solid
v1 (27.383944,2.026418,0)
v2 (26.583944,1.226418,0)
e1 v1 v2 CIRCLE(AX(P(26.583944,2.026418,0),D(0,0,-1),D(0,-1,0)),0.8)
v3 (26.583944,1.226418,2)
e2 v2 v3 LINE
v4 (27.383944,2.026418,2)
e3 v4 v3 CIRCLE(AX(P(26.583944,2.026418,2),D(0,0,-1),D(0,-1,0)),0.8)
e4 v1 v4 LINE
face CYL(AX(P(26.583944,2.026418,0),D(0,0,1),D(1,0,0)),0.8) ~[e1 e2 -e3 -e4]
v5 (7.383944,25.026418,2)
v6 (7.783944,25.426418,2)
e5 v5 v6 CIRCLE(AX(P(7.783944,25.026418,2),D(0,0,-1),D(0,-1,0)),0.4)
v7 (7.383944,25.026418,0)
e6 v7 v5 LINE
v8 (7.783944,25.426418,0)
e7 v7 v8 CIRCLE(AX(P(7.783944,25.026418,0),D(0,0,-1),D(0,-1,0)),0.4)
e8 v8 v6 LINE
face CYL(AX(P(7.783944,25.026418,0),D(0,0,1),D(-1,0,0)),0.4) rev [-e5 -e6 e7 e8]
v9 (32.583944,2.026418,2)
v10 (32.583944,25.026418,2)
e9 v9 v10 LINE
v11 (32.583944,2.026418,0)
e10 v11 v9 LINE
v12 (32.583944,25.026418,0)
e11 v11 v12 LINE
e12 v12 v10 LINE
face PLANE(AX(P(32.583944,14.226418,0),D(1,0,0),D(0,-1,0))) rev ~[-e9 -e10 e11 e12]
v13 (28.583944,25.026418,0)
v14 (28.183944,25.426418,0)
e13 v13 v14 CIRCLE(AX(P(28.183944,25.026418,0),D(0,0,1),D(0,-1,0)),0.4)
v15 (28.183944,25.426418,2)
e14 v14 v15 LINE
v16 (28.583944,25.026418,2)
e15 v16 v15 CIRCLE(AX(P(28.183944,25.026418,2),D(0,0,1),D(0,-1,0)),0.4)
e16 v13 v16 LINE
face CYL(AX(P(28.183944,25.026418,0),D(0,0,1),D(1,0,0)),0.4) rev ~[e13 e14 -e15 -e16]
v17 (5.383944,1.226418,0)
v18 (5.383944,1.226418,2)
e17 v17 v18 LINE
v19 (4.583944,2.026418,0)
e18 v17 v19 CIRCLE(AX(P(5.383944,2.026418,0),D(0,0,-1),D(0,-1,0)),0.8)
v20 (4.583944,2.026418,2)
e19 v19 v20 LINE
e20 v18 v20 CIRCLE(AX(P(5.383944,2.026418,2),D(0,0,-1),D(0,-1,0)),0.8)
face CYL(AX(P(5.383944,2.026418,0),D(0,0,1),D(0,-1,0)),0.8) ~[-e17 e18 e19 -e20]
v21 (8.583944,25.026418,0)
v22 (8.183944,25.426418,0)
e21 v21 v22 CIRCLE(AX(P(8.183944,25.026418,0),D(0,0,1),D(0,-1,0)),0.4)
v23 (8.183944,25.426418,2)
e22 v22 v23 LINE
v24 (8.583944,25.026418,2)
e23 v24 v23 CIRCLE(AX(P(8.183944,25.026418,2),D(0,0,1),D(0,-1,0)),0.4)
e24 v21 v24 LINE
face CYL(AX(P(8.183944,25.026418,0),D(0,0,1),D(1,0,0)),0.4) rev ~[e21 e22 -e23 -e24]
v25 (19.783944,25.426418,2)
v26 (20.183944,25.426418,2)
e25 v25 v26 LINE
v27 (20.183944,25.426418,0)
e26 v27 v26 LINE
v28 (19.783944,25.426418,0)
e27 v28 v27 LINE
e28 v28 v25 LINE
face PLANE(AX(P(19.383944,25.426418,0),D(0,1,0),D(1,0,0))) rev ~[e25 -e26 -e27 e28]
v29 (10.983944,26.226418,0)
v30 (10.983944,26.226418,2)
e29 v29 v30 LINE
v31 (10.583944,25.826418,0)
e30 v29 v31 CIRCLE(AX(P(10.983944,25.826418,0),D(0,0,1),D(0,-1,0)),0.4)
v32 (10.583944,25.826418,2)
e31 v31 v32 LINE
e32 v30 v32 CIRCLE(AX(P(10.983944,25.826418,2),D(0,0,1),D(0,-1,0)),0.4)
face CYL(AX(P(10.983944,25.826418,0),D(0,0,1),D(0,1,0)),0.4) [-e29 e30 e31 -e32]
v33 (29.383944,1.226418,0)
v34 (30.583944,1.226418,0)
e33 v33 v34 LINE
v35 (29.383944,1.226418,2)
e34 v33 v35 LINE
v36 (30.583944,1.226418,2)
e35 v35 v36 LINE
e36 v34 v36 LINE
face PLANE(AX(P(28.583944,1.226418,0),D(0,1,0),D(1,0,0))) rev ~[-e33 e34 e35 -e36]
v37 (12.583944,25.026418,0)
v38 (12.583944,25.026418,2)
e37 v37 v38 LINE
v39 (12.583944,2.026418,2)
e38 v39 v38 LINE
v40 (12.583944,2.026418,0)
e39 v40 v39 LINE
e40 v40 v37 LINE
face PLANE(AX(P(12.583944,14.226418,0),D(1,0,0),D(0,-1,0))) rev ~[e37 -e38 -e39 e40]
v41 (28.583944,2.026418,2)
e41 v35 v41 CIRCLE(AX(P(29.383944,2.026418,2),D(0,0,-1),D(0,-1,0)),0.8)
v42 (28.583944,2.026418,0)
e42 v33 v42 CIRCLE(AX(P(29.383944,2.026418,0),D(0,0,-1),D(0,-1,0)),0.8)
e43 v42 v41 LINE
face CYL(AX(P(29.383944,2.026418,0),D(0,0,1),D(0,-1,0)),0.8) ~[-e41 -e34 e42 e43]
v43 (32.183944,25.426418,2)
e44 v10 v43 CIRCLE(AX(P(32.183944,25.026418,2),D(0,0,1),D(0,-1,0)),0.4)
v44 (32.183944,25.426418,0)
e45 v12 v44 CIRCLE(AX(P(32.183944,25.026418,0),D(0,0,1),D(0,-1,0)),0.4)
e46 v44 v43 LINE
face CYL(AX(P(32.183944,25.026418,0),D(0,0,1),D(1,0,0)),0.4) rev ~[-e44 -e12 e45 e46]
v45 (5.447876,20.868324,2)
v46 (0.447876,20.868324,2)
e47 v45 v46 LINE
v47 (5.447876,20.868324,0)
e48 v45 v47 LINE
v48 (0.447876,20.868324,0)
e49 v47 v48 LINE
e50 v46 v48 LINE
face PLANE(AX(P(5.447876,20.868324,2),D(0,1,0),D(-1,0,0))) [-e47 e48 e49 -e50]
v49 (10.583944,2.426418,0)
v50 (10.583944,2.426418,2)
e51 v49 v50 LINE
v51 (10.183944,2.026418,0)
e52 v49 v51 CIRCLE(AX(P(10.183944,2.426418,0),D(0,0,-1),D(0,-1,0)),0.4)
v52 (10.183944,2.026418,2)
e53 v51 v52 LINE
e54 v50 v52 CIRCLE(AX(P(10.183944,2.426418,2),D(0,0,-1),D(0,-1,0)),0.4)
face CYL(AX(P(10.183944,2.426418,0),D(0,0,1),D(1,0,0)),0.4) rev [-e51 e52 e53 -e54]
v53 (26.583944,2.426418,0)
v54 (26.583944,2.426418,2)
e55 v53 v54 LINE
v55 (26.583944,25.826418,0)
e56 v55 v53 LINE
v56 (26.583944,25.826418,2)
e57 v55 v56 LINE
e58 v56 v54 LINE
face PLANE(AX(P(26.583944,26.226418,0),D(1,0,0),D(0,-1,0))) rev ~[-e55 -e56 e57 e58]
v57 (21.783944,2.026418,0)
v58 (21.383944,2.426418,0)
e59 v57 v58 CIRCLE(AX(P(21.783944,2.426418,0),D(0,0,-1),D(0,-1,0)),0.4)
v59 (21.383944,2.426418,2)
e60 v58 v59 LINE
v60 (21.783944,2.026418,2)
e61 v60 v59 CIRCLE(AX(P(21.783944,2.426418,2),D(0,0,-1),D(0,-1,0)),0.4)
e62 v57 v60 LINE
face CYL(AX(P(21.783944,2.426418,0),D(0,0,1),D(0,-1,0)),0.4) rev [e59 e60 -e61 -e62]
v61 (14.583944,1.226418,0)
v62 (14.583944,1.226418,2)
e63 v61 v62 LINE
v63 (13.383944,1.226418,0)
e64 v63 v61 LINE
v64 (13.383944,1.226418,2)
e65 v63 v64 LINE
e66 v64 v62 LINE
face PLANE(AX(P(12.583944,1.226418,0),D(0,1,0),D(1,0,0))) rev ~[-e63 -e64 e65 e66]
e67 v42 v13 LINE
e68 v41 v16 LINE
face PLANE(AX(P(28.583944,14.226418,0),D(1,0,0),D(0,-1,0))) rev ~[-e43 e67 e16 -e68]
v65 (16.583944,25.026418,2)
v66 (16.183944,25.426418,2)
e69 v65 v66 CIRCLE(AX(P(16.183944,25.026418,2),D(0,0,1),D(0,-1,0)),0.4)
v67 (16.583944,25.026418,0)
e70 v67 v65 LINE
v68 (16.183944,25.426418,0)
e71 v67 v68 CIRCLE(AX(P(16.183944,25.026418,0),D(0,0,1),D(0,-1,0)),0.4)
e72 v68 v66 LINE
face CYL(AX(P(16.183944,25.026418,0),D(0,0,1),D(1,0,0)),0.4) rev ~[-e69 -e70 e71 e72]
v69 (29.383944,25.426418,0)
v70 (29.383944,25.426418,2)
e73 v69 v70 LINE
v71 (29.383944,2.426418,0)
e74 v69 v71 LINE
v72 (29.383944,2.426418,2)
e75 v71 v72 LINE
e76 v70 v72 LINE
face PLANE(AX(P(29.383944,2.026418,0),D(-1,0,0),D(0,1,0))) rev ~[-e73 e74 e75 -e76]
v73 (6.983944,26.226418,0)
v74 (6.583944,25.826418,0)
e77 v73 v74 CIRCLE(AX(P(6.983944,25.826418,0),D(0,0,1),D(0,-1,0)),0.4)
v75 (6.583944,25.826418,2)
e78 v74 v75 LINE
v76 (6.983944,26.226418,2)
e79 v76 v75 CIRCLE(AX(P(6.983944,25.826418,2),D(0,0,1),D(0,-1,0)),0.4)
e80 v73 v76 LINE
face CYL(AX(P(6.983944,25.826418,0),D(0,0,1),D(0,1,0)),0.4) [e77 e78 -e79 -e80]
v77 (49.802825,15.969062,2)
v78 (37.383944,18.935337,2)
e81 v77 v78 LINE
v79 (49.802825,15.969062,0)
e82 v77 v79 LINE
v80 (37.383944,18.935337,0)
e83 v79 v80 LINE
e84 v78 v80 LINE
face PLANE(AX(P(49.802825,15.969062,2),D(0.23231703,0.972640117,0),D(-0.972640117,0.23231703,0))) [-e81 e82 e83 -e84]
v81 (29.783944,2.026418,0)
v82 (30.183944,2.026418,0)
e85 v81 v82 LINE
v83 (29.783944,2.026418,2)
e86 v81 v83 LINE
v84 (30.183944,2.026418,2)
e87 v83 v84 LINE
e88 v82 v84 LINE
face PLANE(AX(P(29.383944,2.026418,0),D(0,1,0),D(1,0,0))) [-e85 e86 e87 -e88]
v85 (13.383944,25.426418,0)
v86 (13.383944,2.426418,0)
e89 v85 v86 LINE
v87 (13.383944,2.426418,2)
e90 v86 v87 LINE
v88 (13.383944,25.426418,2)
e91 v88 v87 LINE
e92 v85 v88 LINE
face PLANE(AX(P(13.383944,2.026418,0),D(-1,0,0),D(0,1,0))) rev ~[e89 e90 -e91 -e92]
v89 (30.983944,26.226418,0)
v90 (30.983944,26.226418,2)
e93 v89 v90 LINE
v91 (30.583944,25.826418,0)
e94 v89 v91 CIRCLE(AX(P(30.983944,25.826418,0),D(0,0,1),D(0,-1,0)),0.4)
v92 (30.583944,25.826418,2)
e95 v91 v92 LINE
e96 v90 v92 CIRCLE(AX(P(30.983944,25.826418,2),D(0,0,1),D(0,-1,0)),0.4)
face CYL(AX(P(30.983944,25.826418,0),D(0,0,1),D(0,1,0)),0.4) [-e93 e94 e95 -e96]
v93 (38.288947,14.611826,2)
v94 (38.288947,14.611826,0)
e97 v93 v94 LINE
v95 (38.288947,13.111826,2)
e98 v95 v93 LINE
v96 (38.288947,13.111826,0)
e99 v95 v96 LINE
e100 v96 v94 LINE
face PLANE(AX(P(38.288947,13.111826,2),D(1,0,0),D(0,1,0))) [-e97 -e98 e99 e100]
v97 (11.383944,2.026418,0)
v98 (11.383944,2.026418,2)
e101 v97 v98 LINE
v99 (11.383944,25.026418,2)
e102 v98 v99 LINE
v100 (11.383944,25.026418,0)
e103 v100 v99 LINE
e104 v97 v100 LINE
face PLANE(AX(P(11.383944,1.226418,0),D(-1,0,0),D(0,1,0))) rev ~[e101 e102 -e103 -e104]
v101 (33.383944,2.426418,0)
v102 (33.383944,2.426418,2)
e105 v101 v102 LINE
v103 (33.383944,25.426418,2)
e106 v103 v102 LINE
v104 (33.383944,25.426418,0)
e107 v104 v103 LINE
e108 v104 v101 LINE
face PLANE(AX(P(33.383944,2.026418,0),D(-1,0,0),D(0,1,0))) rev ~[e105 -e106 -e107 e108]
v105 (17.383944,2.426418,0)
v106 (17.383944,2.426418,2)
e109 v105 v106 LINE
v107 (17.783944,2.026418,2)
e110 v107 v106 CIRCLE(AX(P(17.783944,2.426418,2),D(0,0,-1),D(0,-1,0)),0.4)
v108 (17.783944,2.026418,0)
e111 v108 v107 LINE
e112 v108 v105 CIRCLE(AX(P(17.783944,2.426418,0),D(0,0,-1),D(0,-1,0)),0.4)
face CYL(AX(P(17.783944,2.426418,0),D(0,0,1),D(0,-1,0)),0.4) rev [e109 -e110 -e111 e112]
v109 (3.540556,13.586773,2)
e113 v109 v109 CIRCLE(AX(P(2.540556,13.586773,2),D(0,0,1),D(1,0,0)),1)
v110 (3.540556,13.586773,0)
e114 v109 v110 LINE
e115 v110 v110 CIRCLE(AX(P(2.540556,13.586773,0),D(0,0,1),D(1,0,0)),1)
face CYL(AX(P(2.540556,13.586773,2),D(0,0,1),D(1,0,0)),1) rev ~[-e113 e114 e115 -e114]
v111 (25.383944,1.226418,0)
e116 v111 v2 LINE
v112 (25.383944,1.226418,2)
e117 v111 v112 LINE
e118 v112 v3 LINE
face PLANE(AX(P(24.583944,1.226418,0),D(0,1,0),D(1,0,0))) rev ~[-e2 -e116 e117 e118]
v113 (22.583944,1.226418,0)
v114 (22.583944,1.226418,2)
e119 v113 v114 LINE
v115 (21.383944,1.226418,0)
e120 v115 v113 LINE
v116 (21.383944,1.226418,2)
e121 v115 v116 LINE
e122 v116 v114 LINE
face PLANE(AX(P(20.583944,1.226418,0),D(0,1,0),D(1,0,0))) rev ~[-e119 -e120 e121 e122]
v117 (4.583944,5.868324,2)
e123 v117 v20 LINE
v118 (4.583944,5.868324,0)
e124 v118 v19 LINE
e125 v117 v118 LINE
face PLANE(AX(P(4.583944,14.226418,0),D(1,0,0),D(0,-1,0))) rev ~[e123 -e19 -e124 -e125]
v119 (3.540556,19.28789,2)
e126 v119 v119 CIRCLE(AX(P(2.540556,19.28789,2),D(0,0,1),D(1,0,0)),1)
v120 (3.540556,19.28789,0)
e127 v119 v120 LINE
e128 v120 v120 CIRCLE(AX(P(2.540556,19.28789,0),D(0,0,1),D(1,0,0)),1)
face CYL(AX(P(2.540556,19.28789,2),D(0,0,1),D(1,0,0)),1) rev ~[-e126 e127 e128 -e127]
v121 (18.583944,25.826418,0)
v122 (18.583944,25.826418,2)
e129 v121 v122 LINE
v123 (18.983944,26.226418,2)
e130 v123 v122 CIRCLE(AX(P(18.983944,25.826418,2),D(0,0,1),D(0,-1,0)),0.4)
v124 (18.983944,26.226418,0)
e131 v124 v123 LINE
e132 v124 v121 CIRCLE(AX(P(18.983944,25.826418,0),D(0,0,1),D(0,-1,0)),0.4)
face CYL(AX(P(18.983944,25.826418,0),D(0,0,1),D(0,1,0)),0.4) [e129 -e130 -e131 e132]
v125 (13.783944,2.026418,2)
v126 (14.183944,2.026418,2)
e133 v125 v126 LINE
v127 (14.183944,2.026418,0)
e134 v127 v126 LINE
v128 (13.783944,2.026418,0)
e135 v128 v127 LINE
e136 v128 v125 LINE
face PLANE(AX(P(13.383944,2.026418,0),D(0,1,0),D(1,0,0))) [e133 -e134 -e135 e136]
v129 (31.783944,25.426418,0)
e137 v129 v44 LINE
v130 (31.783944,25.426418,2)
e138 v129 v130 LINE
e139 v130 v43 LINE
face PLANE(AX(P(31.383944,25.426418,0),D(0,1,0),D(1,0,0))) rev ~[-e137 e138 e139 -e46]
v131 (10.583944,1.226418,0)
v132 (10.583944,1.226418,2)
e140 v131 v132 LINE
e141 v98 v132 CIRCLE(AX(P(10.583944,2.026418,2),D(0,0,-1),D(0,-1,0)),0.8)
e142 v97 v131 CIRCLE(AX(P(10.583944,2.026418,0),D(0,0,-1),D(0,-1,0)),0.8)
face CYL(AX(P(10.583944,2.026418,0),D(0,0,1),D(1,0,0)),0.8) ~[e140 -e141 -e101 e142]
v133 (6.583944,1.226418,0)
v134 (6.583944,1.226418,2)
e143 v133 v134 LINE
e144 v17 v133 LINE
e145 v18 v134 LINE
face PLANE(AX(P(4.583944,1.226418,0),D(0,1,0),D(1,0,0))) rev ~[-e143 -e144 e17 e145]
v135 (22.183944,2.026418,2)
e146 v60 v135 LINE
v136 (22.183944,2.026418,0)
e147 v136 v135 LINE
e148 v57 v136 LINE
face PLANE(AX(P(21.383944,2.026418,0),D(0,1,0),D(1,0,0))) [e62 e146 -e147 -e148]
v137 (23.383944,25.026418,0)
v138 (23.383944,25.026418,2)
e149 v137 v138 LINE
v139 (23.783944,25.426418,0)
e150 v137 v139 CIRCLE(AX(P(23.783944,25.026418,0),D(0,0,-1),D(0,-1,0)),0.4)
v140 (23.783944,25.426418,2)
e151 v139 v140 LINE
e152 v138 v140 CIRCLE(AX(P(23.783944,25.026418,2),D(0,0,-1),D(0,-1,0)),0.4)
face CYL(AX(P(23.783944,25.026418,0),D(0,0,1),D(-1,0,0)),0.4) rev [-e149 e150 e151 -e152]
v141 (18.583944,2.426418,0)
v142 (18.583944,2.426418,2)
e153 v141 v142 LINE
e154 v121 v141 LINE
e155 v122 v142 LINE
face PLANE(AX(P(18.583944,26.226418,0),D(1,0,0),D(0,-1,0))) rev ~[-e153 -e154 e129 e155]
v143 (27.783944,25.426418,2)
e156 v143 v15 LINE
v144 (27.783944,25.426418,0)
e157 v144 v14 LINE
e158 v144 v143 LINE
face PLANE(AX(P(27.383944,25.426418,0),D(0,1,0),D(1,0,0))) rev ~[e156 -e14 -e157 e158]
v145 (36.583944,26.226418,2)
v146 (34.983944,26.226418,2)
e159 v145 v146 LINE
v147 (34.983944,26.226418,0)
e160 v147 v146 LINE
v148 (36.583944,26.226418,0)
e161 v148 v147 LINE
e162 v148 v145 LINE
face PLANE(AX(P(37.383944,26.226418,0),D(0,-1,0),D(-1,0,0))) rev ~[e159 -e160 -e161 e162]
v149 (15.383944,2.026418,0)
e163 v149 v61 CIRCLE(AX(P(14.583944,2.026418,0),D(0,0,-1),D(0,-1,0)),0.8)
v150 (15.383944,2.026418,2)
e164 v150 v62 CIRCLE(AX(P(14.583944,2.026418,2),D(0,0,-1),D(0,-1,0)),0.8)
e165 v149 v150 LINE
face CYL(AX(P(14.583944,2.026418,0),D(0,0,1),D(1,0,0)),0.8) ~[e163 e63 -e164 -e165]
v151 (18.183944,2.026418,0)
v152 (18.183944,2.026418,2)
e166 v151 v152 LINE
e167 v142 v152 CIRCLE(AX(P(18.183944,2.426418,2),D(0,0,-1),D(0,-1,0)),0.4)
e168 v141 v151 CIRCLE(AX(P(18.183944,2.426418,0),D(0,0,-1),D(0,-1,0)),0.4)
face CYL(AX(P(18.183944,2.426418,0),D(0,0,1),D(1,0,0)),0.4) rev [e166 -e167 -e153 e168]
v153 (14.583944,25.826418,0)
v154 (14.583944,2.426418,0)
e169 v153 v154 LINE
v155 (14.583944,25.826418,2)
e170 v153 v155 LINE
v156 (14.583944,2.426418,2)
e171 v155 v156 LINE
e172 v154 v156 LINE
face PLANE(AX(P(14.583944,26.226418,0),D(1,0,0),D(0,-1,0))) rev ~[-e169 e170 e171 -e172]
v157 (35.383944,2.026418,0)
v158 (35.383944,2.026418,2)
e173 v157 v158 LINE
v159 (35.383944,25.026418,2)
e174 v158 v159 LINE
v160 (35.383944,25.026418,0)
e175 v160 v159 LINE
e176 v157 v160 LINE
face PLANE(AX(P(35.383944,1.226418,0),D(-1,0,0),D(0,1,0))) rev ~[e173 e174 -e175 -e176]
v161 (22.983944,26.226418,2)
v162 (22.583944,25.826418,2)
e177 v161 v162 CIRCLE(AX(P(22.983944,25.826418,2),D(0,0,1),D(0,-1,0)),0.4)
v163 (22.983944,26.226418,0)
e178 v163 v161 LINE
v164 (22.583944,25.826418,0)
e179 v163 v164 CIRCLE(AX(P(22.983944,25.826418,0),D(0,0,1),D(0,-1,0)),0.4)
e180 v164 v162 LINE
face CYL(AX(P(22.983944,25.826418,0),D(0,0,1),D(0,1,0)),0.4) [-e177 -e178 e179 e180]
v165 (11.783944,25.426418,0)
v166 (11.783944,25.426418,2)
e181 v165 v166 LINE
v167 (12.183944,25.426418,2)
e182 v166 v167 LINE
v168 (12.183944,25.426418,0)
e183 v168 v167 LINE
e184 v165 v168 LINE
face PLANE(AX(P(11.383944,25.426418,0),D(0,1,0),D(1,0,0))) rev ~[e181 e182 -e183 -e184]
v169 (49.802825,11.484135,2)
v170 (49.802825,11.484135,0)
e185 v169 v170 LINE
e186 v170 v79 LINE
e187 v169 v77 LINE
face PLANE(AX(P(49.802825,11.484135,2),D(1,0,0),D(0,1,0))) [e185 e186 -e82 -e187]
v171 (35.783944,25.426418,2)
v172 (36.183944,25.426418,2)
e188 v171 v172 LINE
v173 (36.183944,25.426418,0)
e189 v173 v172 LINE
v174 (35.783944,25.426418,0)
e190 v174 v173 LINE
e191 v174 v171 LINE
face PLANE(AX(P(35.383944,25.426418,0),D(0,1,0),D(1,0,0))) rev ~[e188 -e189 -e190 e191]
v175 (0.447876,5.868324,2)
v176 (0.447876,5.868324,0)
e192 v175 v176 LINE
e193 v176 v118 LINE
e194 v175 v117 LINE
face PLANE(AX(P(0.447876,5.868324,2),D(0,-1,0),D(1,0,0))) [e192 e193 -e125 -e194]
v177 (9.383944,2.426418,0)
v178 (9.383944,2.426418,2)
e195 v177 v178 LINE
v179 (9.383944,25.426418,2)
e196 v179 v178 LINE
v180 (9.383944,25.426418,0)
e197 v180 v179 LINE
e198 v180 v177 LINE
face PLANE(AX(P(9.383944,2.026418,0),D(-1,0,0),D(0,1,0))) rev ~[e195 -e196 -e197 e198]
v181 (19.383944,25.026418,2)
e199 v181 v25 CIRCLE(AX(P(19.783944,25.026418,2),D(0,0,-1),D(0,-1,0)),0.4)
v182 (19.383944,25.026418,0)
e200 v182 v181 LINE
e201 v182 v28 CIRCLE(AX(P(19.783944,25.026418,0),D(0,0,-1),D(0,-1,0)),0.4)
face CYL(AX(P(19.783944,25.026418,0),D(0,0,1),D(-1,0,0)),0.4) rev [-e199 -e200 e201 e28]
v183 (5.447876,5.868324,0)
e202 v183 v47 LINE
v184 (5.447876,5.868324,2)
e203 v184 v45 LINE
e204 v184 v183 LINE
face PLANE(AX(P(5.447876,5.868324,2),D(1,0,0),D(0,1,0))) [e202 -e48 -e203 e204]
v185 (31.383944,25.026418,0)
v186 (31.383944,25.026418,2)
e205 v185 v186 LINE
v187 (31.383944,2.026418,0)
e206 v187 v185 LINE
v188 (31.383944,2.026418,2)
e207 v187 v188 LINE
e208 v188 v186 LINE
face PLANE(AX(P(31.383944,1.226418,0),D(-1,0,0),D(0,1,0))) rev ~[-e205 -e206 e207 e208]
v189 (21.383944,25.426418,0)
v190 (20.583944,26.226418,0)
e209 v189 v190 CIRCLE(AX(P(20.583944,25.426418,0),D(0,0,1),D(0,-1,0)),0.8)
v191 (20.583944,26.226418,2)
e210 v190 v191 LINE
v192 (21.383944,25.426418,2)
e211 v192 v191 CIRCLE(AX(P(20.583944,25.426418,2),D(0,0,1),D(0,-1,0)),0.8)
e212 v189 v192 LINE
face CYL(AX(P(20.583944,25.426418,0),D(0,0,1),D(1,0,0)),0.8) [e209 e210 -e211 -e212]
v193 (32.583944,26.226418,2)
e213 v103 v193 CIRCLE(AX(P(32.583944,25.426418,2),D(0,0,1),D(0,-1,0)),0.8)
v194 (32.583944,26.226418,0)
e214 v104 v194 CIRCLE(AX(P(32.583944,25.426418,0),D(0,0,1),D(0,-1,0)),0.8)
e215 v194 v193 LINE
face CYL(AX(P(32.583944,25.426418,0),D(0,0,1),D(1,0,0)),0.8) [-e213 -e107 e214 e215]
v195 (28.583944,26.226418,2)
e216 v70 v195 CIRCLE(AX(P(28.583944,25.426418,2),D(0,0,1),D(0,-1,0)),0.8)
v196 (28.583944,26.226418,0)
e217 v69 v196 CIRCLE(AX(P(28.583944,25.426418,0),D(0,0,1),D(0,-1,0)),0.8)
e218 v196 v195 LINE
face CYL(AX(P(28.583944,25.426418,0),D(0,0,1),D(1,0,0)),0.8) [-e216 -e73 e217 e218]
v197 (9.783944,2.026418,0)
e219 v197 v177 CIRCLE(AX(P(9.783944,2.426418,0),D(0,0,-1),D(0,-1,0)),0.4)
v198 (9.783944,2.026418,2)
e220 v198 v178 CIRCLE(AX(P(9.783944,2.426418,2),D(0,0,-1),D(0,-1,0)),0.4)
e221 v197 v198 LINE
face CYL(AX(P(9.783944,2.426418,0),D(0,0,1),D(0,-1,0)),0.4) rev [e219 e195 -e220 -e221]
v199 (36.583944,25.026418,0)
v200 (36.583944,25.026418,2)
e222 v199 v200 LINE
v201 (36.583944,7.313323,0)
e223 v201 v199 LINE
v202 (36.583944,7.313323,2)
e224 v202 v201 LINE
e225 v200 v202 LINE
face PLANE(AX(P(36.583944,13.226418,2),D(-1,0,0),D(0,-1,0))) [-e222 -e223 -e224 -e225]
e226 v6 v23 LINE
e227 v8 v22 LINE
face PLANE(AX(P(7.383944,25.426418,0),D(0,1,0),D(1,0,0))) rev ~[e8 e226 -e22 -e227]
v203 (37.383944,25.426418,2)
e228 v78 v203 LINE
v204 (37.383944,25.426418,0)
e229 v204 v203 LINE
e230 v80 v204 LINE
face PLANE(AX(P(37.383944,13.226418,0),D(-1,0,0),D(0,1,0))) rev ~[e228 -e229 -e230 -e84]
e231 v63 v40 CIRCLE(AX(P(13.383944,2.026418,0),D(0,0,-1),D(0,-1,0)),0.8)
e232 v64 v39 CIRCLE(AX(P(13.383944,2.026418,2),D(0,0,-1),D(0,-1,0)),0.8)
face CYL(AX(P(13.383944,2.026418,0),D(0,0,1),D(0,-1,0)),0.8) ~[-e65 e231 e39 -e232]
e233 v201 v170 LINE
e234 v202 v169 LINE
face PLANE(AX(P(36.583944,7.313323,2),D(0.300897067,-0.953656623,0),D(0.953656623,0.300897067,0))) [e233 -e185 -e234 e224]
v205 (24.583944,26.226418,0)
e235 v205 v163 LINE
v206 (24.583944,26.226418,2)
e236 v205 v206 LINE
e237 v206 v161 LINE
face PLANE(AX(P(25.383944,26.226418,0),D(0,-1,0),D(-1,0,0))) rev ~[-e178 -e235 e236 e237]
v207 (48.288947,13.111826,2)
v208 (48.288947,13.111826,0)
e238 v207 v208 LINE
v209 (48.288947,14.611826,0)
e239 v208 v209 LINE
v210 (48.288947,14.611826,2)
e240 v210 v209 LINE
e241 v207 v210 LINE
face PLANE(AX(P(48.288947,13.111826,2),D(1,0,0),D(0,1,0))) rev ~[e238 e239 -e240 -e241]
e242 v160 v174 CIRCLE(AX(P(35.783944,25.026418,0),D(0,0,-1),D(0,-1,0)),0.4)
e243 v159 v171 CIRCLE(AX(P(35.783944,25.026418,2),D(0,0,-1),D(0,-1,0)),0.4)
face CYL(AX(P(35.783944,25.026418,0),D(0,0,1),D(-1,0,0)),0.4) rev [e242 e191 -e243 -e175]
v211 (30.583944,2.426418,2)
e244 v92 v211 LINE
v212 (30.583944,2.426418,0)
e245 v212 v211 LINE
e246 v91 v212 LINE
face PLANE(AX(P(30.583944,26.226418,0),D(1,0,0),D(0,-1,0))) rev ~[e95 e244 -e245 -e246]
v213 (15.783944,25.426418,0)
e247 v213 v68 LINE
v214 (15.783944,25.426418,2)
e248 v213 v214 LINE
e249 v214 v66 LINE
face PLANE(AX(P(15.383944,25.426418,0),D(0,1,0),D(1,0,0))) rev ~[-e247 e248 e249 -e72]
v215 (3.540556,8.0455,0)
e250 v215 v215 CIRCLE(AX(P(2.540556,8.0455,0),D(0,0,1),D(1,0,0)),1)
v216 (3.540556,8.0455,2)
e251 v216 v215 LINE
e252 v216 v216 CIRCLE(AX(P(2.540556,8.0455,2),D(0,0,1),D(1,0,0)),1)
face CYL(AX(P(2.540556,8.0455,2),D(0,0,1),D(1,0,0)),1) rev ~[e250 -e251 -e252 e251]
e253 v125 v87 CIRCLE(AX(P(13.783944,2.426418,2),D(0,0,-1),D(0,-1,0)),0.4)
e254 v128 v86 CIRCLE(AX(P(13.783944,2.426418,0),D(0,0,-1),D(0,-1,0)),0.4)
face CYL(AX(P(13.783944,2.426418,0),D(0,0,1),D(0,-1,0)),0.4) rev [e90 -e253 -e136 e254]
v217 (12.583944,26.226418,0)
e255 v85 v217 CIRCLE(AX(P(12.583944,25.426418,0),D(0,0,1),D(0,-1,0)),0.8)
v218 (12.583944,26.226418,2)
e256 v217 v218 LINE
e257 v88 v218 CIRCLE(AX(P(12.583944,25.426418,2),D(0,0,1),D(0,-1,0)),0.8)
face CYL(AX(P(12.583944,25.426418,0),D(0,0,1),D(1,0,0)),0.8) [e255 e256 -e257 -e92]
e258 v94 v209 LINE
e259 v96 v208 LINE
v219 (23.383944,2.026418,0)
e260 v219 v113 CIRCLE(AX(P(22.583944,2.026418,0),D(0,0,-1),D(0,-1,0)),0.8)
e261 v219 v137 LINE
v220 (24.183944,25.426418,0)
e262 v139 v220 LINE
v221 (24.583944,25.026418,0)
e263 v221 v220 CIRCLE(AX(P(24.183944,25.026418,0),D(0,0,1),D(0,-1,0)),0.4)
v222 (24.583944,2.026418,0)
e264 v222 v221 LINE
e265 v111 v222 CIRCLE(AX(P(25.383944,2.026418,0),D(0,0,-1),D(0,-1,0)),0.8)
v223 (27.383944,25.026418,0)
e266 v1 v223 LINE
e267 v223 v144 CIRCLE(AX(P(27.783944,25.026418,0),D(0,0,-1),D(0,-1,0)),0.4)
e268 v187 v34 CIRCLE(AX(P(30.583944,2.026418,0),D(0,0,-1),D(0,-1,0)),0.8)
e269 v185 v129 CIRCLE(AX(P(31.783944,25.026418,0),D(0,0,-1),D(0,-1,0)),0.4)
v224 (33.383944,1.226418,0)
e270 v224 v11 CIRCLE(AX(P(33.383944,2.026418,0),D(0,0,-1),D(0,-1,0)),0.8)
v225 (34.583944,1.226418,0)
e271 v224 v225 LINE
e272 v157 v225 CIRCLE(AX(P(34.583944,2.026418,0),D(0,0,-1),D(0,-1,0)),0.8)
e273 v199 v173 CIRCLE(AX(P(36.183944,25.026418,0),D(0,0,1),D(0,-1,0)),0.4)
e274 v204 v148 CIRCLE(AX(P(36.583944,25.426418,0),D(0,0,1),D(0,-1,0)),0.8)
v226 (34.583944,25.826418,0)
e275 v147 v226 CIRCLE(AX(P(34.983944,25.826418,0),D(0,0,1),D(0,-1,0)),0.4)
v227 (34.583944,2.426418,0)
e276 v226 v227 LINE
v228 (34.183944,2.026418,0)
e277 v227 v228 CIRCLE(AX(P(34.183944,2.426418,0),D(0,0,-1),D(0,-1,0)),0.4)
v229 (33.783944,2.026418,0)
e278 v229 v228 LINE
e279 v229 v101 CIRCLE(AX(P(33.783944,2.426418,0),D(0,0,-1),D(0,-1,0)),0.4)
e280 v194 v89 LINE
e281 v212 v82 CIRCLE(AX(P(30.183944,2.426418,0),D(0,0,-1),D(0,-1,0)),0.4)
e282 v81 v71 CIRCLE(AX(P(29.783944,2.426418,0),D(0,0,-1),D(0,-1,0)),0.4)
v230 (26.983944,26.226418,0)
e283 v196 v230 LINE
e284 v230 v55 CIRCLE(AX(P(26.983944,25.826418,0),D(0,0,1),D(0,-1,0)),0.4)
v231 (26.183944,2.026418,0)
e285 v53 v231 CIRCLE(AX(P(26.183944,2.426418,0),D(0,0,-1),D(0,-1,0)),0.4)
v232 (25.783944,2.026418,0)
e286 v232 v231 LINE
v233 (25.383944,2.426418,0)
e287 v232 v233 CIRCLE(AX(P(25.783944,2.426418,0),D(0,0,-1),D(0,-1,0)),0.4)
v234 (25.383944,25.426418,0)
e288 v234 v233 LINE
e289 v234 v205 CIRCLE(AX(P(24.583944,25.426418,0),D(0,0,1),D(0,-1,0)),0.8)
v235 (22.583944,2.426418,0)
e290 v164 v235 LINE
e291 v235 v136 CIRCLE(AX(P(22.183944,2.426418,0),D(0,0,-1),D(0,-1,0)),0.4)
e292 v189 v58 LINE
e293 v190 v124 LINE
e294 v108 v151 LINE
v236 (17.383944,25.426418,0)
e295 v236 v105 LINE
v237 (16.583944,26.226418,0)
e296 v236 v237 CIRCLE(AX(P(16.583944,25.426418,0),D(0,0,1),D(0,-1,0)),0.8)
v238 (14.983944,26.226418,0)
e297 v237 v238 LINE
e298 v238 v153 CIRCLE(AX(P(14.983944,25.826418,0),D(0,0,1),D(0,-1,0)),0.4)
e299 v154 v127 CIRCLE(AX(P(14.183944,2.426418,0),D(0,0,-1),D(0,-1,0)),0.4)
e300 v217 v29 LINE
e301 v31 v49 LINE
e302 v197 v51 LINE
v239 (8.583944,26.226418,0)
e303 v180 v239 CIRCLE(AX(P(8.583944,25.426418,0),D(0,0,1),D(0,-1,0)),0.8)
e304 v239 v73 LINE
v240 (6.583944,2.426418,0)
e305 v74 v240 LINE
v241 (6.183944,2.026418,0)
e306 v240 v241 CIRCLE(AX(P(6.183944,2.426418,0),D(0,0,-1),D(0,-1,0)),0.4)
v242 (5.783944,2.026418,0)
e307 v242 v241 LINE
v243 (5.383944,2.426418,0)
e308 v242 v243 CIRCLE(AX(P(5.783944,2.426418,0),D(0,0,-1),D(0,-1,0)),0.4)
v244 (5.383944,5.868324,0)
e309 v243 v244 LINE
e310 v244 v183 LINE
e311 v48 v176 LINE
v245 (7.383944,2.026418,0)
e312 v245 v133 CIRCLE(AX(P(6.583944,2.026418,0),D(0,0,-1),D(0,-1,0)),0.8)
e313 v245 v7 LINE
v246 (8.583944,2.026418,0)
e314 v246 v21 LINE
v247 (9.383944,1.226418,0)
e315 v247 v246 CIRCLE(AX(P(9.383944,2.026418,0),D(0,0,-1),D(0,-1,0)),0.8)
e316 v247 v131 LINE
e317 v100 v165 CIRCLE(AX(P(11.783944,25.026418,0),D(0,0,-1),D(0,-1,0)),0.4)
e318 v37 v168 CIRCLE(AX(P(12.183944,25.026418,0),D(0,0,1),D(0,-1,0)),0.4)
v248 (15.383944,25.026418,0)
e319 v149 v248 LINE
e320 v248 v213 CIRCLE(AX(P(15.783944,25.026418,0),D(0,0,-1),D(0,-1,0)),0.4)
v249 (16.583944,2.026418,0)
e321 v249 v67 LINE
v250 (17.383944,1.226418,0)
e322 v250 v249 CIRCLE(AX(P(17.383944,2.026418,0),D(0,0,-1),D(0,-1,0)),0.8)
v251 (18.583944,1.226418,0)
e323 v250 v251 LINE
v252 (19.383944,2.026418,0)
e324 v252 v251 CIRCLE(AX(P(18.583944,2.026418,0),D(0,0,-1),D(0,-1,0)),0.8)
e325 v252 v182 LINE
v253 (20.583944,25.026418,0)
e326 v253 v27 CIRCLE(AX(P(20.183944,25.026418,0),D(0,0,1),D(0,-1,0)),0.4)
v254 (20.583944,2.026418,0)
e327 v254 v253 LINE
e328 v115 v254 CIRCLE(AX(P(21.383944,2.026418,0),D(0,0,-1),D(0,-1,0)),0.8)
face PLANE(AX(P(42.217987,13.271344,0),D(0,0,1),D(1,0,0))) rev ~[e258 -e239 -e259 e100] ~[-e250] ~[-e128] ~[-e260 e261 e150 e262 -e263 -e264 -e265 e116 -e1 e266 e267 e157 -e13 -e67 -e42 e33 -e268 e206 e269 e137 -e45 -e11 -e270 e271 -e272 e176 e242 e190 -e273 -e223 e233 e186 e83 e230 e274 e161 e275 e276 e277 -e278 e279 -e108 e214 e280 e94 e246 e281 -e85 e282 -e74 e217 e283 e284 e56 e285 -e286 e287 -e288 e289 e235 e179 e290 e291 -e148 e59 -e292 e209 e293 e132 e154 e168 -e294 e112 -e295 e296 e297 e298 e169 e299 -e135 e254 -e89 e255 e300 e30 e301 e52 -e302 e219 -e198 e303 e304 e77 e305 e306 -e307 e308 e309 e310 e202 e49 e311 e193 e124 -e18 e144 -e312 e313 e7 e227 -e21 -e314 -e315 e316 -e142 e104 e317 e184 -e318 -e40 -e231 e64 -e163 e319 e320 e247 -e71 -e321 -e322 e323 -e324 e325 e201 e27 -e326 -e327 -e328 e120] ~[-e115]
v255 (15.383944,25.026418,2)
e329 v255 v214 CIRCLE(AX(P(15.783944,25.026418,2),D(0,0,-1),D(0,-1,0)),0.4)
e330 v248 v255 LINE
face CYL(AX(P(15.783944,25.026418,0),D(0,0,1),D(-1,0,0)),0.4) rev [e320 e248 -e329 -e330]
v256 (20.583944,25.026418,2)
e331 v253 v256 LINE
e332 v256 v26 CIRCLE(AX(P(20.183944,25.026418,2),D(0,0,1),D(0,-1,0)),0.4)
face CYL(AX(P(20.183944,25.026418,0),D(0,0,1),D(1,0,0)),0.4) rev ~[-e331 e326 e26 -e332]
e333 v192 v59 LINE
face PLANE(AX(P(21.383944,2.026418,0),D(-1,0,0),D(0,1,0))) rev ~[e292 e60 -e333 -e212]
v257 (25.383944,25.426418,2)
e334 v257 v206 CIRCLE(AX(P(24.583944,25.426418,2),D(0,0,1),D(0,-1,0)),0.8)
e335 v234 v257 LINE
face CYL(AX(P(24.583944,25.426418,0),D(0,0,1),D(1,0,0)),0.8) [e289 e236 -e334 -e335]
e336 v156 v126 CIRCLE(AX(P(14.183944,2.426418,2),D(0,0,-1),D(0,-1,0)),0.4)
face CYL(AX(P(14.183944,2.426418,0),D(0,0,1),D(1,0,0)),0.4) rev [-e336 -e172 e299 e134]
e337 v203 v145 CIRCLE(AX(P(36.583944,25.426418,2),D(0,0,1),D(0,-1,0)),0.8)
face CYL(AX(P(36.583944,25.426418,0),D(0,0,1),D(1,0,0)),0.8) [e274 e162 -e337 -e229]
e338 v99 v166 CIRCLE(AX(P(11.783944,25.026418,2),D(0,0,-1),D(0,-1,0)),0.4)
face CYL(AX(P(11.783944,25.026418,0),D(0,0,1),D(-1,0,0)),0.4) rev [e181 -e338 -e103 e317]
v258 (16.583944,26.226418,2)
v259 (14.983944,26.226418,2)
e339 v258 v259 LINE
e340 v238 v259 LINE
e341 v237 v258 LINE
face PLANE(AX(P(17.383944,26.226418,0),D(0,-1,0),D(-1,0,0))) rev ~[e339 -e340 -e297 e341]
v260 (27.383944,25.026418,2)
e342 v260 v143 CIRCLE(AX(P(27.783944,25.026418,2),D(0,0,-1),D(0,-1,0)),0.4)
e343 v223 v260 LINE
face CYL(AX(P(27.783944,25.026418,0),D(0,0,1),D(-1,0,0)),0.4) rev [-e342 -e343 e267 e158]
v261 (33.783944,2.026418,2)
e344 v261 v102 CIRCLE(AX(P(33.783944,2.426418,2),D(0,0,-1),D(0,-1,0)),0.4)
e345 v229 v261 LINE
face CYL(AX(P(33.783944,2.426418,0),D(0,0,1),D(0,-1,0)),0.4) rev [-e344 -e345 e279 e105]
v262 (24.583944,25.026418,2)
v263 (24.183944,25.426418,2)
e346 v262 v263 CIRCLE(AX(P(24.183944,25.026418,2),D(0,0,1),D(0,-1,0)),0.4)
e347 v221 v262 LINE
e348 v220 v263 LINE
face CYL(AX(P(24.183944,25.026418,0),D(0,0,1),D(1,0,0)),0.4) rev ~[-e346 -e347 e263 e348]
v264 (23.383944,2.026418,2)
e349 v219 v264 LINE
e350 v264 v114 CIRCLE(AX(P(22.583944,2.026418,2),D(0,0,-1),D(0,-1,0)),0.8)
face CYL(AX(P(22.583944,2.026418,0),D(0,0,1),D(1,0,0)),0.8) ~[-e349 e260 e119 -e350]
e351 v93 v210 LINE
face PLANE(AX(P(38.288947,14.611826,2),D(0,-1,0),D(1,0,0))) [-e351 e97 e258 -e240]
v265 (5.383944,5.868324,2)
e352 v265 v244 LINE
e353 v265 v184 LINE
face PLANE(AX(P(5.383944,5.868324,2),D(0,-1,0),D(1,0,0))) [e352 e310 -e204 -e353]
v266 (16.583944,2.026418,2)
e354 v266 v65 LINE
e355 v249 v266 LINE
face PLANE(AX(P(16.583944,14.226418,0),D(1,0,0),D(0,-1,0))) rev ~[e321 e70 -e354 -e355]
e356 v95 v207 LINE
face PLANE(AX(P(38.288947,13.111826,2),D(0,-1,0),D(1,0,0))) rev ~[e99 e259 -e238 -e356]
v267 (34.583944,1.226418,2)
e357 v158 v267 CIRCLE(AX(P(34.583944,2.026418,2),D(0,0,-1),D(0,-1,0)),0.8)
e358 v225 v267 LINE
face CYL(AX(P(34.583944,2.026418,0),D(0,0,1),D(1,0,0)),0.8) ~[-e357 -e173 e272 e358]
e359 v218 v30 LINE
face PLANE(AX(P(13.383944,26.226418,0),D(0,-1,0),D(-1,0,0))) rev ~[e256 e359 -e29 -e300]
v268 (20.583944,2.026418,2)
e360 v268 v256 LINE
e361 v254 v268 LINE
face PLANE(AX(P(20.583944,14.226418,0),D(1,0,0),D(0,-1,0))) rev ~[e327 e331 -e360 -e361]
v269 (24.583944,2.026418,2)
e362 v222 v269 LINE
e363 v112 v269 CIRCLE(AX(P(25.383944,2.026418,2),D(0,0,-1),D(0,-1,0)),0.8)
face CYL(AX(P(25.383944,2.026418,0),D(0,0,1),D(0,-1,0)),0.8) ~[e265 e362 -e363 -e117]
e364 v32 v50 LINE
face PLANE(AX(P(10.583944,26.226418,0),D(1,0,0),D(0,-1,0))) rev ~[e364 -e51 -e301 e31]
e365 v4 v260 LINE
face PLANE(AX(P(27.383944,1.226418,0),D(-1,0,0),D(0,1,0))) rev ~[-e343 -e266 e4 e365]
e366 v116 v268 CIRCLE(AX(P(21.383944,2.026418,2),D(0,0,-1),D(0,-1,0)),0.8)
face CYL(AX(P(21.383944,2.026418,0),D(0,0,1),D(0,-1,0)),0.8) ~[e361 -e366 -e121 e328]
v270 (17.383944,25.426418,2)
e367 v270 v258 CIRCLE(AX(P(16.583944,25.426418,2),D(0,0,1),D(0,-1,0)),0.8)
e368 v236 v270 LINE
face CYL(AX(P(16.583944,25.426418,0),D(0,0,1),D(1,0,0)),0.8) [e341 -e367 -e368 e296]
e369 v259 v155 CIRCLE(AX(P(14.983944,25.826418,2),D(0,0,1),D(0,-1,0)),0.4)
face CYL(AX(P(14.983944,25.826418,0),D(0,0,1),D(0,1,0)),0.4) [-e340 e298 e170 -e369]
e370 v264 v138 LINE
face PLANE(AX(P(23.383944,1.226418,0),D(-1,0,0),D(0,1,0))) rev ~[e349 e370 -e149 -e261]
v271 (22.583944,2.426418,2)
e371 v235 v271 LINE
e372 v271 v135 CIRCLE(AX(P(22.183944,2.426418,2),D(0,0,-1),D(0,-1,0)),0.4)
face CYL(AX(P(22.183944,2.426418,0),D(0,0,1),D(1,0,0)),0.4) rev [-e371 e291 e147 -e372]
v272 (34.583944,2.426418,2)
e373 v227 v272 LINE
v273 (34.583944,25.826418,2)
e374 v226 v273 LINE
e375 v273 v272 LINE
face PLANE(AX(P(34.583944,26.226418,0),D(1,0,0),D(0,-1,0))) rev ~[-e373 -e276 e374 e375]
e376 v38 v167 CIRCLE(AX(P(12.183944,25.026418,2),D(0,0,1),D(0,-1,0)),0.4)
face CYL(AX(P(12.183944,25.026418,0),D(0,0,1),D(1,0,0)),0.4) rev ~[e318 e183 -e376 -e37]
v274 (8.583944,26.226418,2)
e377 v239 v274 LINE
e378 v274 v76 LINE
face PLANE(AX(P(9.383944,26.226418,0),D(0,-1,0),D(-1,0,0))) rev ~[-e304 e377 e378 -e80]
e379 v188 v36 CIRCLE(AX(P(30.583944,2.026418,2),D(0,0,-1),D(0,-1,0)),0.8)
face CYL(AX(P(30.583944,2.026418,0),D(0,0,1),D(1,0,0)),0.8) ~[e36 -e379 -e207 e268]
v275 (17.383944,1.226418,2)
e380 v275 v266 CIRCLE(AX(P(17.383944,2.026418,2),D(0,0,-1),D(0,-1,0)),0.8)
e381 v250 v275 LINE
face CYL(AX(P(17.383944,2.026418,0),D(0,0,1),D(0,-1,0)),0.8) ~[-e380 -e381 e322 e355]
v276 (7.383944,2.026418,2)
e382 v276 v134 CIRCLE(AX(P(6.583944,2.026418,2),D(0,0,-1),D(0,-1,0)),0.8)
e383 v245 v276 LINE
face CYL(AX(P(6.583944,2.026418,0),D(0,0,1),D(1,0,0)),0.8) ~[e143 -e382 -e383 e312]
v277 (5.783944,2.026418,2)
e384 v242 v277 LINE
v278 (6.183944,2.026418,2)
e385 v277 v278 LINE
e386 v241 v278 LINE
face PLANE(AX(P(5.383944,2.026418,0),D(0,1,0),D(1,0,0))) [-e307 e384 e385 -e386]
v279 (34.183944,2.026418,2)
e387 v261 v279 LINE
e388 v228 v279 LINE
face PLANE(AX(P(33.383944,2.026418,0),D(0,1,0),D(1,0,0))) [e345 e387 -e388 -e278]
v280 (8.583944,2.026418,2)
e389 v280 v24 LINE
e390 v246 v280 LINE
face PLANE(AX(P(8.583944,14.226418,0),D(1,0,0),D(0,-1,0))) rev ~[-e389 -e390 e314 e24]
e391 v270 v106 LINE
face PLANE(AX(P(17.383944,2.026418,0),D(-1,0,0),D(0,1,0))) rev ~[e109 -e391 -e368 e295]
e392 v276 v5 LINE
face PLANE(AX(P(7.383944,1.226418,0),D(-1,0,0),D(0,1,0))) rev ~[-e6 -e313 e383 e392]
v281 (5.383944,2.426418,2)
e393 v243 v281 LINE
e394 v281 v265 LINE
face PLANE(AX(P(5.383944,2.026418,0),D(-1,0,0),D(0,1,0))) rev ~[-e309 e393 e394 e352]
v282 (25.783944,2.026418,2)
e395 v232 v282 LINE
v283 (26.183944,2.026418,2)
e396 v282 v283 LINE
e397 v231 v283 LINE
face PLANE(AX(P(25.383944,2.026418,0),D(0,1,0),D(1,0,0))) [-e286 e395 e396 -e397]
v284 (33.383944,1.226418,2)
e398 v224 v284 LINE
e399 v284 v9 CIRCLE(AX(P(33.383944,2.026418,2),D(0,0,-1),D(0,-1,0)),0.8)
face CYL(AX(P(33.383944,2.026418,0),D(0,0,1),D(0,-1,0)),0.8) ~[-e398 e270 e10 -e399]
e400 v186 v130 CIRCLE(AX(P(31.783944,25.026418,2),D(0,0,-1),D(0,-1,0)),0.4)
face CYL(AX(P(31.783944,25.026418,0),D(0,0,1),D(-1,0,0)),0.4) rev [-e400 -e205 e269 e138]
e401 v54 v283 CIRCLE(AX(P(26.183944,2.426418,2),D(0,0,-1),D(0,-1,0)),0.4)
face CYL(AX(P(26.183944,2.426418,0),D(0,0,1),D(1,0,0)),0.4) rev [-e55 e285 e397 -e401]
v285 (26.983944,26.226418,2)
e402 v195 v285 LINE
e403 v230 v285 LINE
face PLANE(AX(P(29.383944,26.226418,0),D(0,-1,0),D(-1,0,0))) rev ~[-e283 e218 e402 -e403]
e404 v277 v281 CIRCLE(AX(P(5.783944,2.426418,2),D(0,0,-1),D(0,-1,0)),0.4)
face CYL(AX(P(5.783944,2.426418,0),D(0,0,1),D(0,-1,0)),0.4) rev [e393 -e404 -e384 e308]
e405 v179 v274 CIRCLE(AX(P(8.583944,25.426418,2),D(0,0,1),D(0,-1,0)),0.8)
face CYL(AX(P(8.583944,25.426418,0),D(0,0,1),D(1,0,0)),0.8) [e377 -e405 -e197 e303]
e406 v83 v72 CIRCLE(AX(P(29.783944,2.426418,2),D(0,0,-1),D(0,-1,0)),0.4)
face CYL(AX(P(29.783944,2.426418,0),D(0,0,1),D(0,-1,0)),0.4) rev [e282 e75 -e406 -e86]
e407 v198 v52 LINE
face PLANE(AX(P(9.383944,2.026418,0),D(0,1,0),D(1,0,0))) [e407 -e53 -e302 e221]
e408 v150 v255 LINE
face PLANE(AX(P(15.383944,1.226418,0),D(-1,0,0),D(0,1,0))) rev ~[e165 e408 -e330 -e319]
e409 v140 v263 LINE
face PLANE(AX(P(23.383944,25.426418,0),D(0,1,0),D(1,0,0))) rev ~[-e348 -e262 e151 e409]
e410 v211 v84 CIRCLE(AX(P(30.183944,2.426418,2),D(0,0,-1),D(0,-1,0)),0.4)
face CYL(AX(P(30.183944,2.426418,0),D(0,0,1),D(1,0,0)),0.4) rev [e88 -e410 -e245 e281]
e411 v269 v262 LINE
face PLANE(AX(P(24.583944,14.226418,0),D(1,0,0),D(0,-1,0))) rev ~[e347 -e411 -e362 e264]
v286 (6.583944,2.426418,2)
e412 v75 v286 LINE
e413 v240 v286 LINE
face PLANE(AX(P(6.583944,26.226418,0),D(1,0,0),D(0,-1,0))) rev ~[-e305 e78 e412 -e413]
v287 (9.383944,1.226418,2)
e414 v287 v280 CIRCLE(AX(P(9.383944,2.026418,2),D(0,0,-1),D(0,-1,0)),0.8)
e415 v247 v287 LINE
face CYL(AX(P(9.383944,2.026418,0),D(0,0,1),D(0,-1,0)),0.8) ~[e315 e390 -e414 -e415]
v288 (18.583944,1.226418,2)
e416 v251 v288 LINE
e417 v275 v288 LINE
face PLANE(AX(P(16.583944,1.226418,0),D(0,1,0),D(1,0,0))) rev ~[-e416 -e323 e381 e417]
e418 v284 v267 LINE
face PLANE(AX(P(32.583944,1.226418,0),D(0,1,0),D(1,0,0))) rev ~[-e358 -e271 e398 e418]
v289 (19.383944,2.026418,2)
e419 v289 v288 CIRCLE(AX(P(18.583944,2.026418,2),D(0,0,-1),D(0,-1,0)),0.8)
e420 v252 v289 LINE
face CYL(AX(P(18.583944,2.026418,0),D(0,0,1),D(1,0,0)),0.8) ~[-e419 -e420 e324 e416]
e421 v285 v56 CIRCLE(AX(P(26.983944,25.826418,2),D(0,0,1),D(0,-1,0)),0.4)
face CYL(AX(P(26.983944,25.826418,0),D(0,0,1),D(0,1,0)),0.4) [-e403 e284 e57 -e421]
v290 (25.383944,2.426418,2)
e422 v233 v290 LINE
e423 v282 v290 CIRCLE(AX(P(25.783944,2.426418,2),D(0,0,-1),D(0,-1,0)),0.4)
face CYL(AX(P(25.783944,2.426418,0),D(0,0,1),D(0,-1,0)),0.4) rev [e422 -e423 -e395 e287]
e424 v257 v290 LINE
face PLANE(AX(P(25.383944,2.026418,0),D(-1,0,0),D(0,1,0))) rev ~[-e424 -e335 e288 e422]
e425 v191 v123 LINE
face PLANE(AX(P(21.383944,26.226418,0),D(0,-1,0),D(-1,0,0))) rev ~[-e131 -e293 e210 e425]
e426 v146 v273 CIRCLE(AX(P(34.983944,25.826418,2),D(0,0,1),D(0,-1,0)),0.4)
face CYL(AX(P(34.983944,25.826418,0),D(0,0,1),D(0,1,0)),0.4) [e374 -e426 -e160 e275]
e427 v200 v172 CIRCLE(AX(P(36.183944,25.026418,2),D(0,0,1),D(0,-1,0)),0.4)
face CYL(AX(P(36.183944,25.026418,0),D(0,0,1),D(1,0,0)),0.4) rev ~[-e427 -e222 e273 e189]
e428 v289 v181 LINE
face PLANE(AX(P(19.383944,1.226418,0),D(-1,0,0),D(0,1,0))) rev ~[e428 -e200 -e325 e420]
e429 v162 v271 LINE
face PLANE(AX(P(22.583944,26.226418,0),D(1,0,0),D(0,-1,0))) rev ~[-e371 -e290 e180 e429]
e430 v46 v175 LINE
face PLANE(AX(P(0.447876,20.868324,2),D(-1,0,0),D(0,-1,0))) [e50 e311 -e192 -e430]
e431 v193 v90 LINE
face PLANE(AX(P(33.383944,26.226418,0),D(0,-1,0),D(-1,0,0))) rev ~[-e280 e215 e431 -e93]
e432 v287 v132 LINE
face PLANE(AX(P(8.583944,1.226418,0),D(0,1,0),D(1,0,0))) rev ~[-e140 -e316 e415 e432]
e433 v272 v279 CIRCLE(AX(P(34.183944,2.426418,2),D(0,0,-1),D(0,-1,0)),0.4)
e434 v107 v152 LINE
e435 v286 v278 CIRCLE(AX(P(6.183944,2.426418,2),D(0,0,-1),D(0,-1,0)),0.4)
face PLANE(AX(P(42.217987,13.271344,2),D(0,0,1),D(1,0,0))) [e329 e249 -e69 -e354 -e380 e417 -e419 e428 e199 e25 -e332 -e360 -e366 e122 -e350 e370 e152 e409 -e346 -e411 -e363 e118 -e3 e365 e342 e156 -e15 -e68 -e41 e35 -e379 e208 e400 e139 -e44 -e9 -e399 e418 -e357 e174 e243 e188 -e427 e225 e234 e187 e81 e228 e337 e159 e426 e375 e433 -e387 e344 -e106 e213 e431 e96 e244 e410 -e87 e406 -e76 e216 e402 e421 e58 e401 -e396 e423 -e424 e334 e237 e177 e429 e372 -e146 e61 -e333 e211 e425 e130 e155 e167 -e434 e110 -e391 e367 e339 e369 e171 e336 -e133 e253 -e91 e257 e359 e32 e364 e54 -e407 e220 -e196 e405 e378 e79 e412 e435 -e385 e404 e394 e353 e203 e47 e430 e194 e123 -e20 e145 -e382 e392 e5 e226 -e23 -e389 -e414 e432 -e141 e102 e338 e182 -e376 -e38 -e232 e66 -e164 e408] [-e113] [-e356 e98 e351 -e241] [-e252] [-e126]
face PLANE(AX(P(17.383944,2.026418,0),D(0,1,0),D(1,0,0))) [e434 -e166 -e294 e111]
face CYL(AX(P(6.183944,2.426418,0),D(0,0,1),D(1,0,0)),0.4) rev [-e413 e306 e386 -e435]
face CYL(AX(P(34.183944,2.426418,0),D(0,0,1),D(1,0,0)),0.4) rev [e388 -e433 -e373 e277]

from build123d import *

# Parameters (mm, degrees)
F0_W      = 1.2
F0_H      = 0.8
F1_DEPTH  = 2
F2_R      = 0.4
F3_R      = 0.8
F11_DEPTH = 2
F14_DEPTH = 2
F15_R     = 1
F16_DEPTH = 2.001
F17_W     = 10
F17_H     = 1.5
F18_DEPTH = 2.001


with BuildPart() as f1:
    # F0 (on Top) → F1 (new body)
    with BuildSketch(Plane.XY):
        Polygon((8.5839435473, 25.4264183629), (8.5839435473, 13.2264183629), (9.3839435473, 13.2264183629), (9.3839435473, 26.2264183629), (6.5839435473, 26.2264183629), (6.5839435473, 2.0264183629), (6.5839435473, 1.2264183629), (7.3839435473, 1.2264183629), (7.3839435473, 25.4264183629), align=None)
        Polygon((4.5839435473, 1.2264183629), (5.3839435473, 1.2264183629), (5.3839435473, 2.0264183629), (5.3839435473, 14.2264183629), (4.5839435473, 14.2264183629), align=None)
        with Locations((5.9839435473, 1.6264183629)):
            Rectangle(F0_W, F0_H)
    extrude(amount=F1_DEPTH)

    # F2
    f2_edges = [f1.edges().sort_by_distance(p)[0] for p in [
        (7.383944, 25.426418, 1),
        (8.583944, 25.426418, 1),
        (5.383944, 2.026418, 1),
        (6.583944, 2.026418, 1),
        (6.583944, 26.226418, 1),
    ]]
    fillet(f2_edges, radius=F2_R)

    # F3
    f3_edges = [f1.edges().sort_by_distance(p)[0] for p in [
        (9.383944, 26.226418, 1),
        (7.383944, 1.226418, 1),
        (4.583944, 1.226418, 1),
    ]]
    fillet(f3_edges, radius=F3_R)


with BuildPart() as f4_1:
    # F4: copy of F1
    add(f1.part.moved(Location((4, 0, 0))))


with BuildPart() as f1_1:
    add(f1.part)

    # F5: union F4_1
    add(f4_1.part)


with BuildPart() as f6_1:
    # F6: copy of F1
    add(f1_1.part.moved(Location((8, 0, 0))))


with BuildPart() as f1_2:
    add(f1_1.part)

    # F7: union F6_1
    add(f6_1.part)


with BuildPart() as f8_1:
    # F8: copy of F1
    add(f1_2.part.moved(Location((16, 0, 0))))


with BuildPart() as f1_3:
    add(f1_2.part)

    # F9: union F8_1
    add(f8_1.part)

    # F10 (on face) → F11 (join)
    with BuildSketch(Plane.XY.offset(2)):
        Polygon((5.4478760238, 5.8683240786), (5.4478760238, 20.8683240786), (0.4478760238, 20.8683240786), (0.4478760238, 5.8683240786), (4.5839435473, 5.8683240786), (4.5839435473, 14.2264183629), (5.3839435473, 14.2264183629), (5.3839435473, 5.8683240786), align=None)
    extrude(amount=-F11_DEPTH)

    # F12: union 

    # F13 (on face) → F14 (join)
    with BuildSketch(Plane.XY.offset(2)):
        Polygon((49.8028248549, 15.969062224), (37.3839435473, 18.9353367689), (37.3839435473, 13.2264183629), (36.5839435473, 13.2264183629), (36.5839435473, 7.3133227415), (49.8028248549, 11.4841348702), align=None)
    extrude(amount=-F14_DEPTH)

    # F15 (on face) → F16 (cut, through all)
    with BuildSketch(Plane.XY.offset(2)):
        with Locations((2.5405562483, 19.2878898233)):
            Circle(F15_R)
        with Locations((2.5405562483, 13.5867726058)):
            Circle(F15_R)
        with Locations((2.5405562483, 8.0455001444)):
            Circle(F15_R)
    extrude(amount=-F16_DEPTH, mode=Mode.SUBTRACT)

    # F17 (on face) → F18 (cut, through all)
    with BuildSketch(Plane.XY.offset(2)):
        with Locations((43.2889471948, 13.8618260324)):
            Rectangle(F17_W, F17_H)
    extrude(amount=-F18_DEPTH, mode=Mode.SUBTRACT)


solid = f1_3.part
